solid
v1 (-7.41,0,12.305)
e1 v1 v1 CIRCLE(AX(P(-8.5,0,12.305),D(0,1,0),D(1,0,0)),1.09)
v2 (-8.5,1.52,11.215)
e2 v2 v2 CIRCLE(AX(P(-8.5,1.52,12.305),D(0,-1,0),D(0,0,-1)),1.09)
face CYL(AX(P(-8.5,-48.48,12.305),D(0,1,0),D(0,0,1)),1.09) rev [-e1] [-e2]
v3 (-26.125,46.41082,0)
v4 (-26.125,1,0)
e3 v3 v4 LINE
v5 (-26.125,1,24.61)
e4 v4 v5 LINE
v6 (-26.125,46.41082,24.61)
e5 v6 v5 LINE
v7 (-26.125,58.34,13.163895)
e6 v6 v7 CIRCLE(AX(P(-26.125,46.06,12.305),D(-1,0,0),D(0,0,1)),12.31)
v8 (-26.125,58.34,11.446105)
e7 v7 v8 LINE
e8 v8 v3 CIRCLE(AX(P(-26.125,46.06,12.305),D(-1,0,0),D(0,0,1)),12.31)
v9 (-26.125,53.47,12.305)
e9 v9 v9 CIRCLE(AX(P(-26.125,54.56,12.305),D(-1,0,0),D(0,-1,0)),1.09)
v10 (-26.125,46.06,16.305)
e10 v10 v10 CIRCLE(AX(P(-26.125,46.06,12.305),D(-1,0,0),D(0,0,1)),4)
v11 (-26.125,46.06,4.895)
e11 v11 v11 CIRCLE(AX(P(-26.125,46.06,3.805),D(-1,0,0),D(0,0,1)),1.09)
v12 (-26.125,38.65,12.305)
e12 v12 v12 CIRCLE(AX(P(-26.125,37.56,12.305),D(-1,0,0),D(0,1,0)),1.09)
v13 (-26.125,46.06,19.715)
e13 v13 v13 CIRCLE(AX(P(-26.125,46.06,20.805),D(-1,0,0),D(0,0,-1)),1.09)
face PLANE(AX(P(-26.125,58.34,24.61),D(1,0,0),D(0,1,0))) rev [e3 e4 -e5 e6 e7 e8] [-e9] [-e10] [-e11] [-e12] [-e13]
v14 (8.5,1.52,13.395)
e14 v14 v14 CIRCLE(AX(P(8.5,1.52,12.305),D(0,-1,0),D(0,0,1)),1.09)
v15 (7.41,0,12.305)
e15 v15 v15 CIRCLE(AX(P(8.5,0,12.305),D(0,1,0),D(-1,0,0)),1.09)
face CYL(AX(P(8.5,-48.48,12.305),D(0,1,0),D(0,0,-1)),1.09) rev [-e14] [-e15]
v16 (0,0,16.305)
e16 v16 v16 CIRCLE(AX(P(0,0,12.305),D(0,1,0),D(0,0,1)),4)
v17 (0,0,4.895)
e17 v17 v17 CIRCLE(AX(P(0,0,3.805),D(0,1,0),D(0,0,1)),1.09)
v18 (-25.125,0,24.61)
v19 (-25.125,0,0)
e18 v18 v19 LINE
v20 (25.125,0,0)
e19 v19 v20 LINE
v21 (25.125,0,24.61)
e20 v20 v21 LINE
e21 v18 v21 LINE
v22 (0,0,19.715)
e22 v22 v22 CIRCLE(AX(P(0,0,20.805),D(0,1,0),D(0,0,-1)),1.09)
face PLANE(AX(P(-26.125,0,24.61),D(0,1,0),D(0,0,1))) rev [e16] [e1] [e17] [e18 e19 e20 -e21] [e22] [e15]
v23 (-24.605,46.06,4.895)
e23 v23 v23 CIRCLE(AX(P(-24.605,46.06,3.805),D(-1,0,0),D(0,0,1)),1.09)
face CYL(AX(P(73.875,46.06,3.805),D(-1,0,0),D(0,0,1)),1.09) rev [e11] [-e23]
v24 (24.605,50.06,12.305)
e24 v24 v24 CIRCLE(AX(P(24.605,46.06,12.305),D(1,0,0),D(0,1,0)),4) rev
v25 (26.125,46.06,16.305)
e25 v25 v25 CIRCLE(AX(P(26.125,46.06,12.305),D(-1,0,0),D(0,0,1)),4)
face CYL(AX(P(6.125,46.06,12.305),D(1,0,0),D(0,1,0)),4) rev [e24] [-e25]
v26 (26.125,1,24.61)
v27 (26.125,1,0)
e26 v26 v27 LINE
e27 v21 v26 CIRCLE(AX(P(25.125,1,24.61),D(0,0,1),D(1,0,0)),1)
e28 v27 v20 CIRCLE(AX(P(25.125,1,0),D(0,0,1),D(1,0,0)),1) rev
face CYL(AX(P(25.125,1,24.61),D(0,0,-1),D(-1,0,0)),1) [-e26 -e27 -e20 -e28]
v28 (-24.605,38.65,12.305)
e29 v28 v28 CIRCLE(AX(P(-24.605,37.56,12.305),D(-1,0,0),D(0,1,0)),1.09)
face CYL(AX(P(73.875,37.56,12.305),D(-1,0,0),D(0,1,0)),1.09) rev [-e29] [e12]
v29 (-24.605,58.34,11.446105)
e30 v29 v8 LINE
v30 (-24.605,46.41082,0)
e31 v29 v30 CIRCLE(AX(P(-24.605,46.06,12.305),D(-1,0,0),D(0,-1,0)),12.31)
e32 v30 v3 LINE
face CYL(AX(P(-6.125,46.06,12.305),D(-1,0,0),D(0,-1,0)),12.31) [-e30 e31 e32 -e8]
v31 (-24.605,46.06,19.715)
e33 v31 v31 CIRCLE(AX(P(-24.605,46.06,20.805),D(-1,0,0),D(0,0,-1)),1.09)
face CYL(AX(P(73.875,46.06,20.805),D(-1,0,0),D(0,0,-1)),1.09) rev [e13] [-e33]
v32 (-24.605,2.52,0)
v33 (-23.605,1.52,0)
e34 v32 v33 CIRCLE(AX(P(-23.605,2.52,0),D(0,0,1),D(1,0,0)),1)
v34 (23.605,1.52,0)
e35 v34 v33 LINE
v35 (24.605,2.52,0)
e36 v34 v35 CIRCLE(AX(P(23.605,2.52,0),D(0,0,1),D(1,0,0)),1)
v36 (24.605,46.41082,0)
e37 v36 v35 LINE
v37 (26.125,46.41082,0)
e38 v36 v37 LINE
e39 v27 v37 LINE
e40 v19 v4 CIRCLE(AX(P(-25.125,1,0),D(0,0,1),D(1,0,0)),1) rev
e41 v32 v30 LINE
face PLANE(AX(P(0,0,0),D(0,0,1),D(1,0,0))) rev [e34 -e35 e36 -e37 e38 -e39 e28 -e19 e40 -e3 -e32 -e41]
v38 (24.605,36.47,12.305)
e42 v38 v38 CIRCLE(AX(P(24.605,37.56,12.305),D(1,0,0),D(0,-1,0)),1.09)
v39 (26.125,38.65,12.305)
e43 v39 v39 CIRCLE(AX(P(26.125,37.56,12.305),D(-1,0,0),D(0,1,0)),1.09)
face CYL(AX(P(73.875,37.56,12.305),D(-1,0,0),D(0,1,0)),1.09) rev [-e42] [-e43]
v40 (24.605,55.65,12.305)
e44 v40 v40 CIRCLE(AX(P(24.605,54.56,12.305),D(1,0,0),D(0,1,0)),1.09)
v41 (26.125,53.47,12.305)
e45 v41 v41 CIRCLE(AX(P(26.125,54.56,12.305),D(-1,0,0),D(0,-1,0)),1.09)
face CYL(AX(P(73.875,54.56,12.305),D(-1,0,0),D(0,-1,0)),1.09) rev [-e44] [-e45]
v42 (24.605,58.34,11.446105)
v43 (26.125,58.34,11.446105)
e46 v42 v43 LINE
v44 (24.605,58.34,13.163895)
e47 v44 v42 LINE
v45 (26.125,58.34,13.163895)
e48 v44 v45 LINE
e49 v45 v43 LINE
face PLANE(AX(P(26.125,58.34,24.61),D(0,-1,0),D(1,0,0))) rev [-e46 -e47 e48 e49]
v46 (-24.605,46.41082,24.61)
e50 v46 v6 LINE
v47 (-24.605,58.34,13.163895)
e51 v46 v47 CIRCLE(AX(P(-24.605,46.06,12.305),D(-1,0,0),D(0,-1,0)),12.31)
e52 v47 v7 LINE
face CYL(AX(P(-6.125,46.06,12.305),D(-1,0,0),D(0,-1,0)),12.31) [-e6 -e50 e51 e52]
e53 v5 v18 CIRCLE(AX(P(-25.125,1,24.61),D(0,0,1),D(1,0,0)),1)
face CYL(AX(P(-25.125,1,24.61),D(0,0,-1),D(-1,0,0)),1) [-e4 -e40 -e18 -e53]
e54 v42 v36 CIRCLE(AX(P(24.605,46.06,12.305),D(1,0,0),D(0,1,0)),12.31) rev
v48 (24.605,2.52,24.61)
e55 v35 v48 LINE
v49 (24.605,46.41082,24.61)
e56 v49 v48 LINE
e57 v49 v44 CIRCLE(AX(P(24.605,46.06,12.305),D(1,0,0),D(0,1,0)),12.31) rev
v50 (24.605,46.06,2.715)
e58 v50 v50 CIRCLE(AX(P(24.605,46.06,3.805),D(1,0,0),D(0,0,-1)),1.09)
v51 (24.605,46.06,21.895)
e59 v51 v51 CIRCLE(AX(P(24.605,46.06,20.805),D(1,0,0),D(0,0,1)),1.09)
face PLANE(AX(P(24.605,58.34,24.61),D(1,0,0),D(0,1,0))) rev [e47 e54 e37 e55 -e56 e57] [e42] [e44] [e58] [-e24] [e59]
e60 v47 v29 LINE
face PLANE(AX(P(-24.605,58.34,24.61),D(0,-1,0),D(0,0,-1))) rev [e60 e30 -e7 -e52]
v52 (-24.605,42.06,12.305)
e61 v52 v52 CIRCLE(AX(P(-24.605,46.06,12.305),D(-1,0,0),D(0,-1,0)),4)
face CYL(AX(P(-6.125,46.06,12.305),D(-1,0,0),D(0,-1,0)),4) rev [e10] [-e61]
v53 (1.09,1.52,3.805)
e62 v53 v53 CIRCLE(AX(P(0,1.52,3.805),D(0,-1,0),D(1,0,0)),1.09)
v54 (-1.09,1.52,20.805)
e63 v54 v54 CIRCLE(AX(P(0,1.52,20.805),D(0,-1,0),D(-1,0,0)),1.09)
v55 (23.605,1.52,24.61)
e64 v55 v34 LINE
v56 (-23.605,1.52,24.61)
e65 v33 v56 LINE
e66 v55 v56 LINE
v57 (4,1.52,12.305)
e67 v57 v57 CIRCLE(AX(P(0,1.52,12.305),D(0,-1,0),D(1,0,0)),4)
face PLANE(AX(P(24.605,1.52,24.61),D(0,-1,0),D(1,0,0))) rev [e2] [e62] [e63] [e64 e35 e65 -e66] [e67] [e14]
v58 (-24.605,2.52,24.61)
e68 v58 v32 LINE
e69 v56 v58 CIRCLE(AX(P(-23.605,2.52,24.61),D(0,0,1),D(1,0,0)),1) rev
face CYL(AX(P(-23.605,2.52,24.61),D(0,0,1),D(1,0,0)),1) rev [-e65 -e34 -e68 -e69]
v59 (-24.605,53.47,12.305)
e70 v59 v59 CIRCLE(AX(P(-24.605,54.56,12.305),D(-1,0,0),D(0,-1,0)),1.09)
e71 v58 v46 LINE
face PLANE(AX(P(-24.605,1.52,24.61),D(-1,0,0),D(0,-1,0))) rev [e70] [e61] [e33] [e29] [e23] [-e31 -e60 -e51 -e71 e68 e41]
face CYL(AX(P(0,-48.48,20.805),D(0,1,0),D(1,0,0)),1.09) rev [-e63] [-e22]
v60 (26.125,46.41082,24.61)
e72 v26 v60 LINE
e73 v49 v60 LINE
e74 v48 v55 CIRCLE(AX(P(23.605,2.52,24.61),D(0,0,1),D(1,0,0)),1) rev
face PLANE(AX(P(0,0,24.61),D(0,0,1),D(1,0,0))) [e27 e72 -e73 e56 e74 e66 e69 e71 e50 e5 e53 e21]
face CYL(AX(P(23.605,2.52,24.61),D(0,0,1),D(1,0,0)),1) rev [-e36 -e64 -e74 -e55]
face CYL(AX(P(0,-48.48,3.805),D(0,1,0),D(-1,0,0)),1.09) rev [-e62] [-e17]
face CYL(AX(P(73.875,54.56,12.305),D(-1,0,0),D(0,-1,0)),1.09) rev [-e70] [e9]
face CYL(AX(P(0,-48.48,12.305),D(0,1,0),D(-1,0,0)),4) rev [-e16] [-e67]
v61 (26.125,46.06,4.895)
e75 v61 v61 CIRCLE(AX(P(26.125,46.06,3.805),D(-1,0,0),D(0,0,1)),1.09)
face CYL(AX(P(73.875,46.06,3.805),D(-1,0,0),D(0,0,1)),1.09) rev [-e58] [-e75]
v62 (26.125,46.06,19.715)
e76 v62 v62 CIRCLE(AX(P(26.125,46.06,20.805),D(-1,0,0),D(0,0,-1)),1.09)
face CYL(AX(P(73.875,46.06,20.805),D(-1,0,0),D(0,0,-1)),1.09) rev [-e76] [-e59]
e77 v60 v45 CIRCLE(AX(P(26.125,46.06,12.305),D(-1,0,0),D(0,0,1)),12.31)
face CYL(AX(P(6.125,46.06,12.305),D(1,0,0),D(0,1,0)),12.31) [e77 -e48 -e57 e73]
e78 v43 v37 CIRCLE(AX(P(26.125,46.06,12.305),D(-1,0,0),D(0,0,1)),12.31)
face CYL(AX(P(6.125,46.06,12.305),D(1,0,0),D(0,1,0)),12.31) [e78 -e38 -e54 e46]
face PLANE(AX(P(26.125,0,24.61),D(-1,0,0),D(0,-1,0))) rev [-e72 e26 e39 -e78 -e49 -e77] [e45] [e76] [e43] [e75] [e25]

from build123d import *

# Parameters (mm, degrees)
BOSS_EXTRUDE1_DEPTH    = 24.61
CUT_EXTRUDE5_START     = -1.52
CUT_EXTRUDE5_OUTLINE_R = 4
CUT_EXTRUDE5_DEPTH     = 1.52
SKETCH4_R              = 1.09
CUT_EXTRUDE6_DEPTH     = 100
CIRPATTERN1_COUNT      = 4
SKETCH5_R              = 4
CUT_EXTRUDE7_DEPTH     = 50
SKETCH6_R              = 1.09
CUT_EXTRUDE8_DEPTH     = 50
CIRPATTERN2_COUNT      = 4
FILLET1_R              = 1


# Read off the part's stored shape, not the designer's step: Cut-Extrude5
with BuildPart() as part:
    # Sketch1 → Boss-Extrude1 (new body)
    with BuildSketch(Plane.XY):
        Polygon((-26.125, 58.34), (-26.125, 0), (26.125, 0), (26.125, 58.34), (24.605, 58.34), (24.605, 1.52), (-24.605, 1.52), (-24.605, 58.34), align=None)
    extrude(amount=BOSS_EXTRUDE1_DEPTH)

    # Cut-Extrude5 outline → Cut-Extrude5 (cut)
    with BuildSketch(Plane.ZY.offset(26.125).offset(CUT_EXTRUDE5_START)):
        with BuildLine():
            ThreePointArc((0, 46.410820467), (3.42252503, 54.582777623), (11.446105362, 58.34))
            Line((11.446105362, 58.34), (0, 58.34))
            Line((0, 58.34), (0, 46.410820467))
        make_face()
        with BuildLine():
            Line((24.61, 58.34), (13.163894638, 58.34))
            ThreePointArc((13.163894638, 58.34), (21.18747497, 54.582777623), (24.61, 46.410820467))
            Line((24.61, 46.410820467), (24.61, 58.34))
        make_face()
        with Locations((12.305, 46.06)):
            Circle(CUT_EXTRUDE5_OUTLINE_R)
    cut_extrude5 = extrude(amount=CUT_EXTRUDE5_DEPTH, mode=Mode.SUBTRACT)

    # Mirror1: Cut-Extrude5 across plane
    add(cut_extrude5.mirror(Plane(origin=(0, 0, 0), x_dir=(0, 0, 1), z_dir=(1, 0, 0))), mode=Mode.SUBTRACT)

    # Sketch4 → Cut-Extrude6 (cut)
    with BuildSketch(Plane.ZY.offset(26.125)):
        with Locations(Location((12.305, 54.56, 0), (0, 0, 270))):
            Circle(SKETCH4_R)
    cut_extrude6 = extrude(amount=-CUT_EXTRUDE6_DEPTH, mode=Mode.SUBTRACT)

    # CirPattern1: Cut-Extrude6 ×4 about axis
    cirpattern1_axis = Axis((0, 46.06, 12.305), (1, 0, 0))
    for i in range(1, CIRPATTERN1_COUNT):
        add(cut_extrude6.rotate(cirpattern1_axis, i * 360 / CIRPATTERN1_COUNT), mode=Mode.SUBTRACT)

    # Sketch5 → Cut-Extrude7 (cut, symmetric)
    with BuildSketch(Plane(origin=(0, 1.52, 0), x_dir=(1, 0, 0), z_dir=(0, 1, 0))):
        with Locations(Location((0, -12.305, 0), (0, 0, 270))):
            Circle(SKETCH5_R)
    extrude(amount=CUT_EXTRUDE7_DEPTH, both=True, mode=Mode.SUBTRACT)

    # Sketch6 → Cut-Extrude8 (cut, symmetric)
    with BuildSketch(Plane(origin=(0, 1.52, 0), x_dir=(1, 0, 0), z_dir=(0, 1, 0))):
        with Locations(Location((0, -3.805, 0), (0, 0, 270))):
            Circle(SKETCH6_R)
    cut_extrude8 = extrude(amount=CUT_EXTRUDE8_DEPTH, both=True, mode=Mode.SUBTRACT)

    # CirPattern2: Cut-Extrude8 ×4 about axis
    cirpattern2_axis = Axis((0, 0, 12.305), (0, 1, 0))
    for i in range(1, CIRPATTERN2_COUNT):
        add(cut_extrude8.rotate(cirpattern2_axis, i * 360 / CIRPATTERN2_COUNT), mode=Mode.SUBTRACT)

    # Fillet1
    fillet1_edges = [part.edges().sort_by_distance(p)[0] for p in [
        (-24.605, 1.52, 12.305),
        (24.605, 1.52, 12.305),
        (26.125, 0, 12.305),
        (-26.125, 0, 12.305),
    ]]
    fillet(fillet1_edges, radius=FILLET1_R)


solid = part.part
